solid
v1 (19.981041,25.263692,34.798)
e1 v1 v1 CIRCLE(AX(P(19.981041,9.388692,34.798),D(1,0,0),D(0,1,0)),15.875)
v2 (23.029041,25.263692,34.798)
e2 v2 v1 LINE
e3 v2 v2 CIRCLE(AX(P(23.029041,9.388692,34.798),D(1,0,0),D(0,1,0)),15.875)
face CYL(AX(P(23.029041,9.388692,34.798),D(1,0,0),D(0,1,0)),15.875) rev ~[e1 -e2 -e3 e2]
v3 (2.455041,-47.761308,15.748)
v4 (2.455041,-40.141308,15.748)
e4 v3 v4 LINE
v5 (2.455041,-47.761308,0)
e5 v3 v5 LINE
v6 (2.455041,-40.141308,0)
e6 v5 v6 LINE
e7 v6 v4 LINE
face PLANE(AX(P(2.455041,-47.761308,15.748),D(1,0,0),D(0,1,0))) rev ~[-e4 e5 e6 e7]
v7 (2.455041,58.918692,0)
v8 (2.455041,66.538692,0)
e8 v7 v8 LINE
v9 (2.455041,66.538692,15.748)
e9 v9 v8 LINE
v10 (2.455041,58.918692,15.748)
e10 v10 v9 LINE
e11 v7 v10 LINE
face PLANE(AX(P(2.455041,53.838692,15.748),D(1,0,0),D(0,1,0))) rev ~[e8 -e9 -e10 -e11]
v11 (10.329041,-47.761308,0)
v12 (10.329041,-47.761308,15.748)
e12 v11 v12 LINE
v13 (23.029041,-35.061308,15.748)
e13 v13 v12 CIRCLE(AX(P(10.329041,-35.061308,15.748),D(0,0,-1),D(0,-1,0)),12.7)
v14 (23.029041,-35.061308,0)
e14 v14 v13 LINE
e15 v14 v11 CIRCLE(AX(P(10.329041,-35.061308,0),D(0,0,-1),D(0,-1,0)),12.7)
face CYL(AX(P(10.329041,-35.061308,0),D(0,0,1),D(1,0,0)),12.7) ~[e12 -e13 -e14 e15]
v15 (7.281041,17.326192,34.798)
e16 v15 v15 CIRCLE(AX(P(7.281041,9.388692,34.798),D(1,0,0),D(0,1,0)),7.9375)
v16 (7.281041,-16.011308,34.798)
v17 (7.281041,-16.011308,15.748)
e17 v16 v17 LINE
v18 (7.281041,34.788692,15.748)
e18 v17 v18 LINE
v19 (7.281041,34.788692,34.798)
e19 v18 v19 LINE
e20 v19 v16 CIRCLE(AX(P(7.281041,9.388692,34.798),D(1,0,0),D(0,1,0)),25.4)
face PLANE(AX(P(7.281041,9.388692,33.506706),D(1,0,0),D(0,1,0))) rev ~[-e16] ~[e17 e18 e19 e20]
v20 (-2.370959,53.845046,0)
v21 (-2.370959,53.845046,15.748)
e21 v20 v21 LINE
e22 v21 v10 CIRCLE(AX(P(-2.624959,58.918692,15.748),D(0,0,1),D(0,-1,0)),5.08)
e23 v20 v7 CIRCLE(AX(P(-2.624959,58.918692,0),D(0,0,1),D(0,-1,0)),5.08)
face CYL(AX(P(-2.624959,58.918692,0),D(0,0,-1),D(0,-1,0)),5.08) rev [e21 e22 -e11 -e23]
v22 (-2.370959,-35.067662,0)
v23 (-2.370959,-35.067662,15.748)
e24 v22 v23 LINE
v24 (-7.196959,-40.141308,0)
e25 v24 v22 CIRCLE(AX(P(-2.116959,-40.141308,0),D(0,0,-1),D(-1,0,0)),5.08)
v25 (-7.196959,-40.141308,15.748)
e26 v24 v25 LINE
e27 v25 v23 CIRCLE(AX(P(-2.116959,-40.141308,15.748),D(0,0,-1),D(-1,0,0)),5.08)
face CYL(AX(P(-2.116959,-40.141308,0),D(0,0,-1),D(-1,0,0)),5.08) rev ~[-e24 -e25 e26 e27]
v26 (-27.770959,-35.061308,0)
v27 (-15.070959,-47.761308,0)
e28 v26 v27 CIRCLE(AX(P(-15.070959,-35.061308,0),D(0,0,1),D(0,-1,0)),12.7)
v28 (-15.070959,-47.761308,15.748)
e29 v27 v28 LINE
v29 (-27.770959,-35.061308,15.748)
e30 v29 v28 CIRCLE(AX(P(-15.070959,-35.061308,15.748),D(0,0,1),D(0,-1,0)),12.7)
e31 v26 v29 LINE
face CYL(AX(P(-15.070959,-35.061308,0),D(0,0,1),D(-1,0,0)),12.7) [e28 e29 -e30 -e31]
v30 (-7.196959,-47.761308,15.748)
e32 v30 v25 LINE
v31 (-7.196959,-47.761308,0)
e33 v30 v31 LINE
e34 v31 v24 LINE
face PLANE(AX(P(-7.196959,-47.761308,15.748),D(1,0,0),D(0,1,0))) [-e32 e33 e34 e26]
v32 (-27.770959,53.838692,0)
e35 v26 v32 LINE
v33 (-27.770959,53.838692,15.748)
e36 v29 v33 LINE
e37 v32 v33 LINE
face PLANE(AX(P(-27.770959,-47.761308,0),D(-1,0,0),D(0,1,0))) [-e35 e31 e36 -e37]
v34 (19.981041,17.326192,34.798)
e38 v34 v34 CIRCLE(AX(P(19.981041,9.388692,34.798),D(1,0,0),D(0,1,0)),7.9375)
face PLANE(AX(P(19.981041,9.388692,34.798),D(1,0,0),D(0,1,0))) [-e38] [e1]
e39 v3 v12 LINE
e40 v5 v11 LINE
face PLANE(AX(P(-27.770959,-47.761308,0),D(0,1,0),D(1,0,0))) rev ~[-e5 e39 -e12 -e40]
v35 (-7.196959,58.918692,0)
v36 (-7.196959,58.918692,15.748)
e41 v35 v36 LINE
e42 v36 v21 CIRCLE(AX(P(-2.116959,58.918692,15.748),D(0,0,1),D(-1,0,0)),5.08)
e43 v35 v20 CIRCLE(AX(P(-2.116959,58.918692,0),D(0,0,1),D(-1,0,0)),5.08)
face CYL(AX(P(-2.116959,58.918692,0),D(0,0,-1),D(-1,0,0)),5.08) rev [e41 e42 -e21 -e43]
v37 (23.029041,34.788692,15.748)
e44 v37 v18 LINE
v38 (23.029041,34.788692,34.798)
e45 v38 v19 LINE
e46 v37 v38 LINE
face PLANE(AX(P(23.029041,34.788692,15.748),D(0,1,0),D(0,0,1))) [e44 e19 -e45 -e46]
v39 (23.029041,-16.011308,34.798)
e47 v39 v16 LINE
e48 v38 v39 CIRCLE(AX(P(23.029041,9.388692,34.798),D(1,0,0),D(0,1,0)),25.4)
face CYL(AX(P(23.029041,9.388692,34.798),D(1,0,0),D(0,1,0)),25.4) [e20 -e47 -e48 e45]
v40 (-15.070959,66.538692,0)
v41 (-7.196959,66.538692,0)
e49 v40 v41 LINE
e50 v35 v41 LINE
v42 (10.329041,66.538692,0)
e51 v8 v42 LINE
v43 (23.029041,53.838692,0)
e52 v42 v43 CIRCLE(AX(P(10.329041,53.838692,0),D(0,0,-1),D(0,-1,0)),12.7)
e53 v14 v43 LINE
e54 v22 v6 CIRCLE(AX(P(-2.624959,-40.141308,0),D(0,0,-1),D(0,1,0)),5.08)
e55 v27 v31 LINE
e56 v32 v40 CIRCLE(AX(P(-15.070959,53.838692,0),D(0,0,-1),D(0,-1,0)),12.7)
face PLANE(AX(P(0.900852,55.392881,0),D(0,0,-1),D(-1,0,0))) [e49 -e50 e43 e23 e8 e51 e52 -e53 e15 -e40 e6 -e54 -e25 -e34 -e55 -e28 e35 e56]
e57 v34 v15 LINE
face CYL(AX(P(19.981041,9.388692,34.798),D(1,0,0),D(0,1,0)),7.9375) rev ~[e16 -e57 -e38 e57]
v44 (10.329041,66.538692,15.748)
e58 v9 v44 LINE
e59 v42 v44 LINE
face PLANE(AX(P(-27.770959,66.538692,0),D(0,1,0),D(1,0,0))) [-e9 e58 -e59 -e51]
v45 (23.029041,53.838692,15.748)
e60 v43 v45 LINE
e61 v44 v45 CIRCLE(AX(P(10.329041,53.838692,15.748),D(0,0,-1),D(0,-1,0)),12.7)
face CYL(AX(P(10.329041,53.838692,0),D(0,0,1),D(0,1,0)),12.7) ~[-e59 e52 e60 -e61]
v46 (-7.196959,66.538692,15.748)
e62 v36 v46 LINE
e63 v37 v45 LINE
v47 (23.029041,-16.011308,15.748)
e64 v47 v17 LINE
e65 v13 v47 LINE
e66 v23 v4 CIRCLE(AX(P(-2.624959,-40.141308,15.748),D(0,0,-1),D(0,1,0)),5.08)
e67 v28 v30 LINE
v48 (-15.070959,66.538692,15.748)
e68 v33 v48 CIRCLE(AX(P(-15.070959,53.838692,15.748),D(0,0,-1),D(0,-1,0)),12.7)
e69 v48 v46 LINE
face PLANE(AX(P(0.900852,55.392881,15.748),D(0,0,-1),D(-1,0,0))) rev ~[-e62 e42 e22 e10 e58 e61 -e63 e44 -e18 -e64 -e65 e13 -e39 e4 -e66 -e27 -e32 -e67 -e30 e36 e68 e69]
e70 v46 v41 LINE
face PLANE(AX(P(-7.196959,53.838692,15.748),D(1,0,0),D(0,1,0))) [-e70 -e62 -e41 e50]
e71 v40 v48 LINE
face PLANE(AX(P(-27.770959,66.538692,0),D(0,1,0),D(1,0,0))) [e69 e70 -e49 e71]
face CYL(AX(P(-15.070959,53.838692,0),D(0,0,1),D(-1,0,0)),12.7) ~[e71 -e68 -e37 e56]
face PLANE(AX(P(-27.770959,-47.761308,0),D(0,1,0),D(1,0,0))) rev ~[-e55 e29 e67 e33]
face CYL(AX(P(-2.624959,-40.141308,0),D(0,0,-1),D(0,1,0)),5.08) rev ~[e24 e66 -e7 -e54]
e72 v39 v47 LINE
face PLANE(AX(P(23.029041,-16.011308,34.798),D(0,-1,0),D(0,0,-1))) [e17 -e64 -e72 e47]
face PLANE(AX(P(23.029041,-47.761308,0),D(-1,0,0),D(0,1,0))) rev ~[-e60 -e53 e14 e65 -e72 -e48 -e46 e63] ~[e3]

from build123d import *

# Parameters (mm, degrees)
F0_W        = 50.8
F0_H        = 114.3
F1_DEPTH    = 15.748
F2_W        = 9.652
F2_H        = 12.7
F3_DEPTH    = 25.4
F4_R        = 12.7
F5_T1_DEPTH = 15.748
F7_DEPTH    = 15.748
F8_R        = 15.875
F9_DEPTH    = 3.048
F10_R       = 7.9375
F11_DEPTH   = 25.4


# Not quite as in the source:
# - a fillet or chamfer that OpenCascade refuses, or shapes differently, is made with other operations: its cross-section is extruded or revolved along the edge and cut away or added


with BuildPart() as f1:
    # F0 (on Top) → F1 (new body)
    with BuildSketch(Plane.XY):
        with Locations((-2.3709591478, 9.3886919219)):
            Rectangle(F0_W, F0_H)
    extrude(amount=F1_DEPTH)

    # F2 (on face) → F3 (cut)
    with BuildSketch(Plane.XY.offset(15.748)):
        with Locations((-2.3709591478, -41.4113080781)):
            Rectangle(F2_W, F2_H)
        with Locations((-2.3709591478, 60.1886919219)):
            Rectangle(F2_W, F2_H)
    extrude(amount=-F3_DEPTH, mode=Mode.SUBTRACT)

    # F4
    f4_edges = [f1.edges().sort_by_distance(p)[0] for p in [
        (-27.770959, 66.538692, 7.874),
        (23.029041, 66.538692, 7.874),
        (-27.770959, -47.761308, 7.874),
        (23.029041, -47.761308, 7.874),
    ]]
    fillet(f4_edges, radius=F4_R)

    # F5: fillet of radius 5.08 on 4 edges, made by hand

    # F5_s2 → F5_t1 (join)
    with BuildSketch(Plane.XY):
        with BuildLine():
            ThreePointArc((-2.6249591478, 53.8386919219), (0.9671433006, 55.3265894735), (2.4550408522, 58.9186919219))
            Line((2.4550408522, 58.9186919219), (2.4550408522, 53.8386919219))
            Line((2.4550408522, 53.8386919219), (-2.6249591478, 53.8386919219))
        make_face()
        with BuildLine():
            ThreePointArc((-7.1969591478, 58.9186919219), (-5.7090615962, 55.3265894735), (-2.1169591478, 53.8386919219))
            Line((-2.1169591478, 53.8386919219), (-7.1969591478, 53.8386919219))
            Line((-7.1969591478, 53.8386919219), (-7.1969591478, 58.9186919219))
        make_face()
        with BuildLine():
            ThreePointArc((-2.6249591478, -35.0613080781), (0.9671433006, -36.5492056297), (2.4550408522, -40.1413080781))
            Line((2.4550408522, -40.1413080781), (2.4550408522, -35.0613080781))
            Line((2.4550408522, -35.0613080781), (-2.6249591478, -35.0613080781))
        make_face()
        with BuildLine():
            ThreePointArc((-7.1969591478, -40.1413080781), (-5.7090615962, -36.5492056297), (-2.1169591478, -35.0613080781))
            Line((-2.1169591478, -35.0613080781), (-7.1969591478, -35.0613080781))
            Line((-7.1969591478, -35.0613080781), (-7.1969591478, -40.1413080781))
        make_face()
    extrude(amount=F5_T1_DEPTH)

    # F6 (on face) → F7 (join)
    with BuildSketch(Plane.YZ.offset(23.0290408522)):
        with BuildLine():
            Line((34.7886919219, 15.748), (34.7886919219, 34.798))
            ThreePointArc((34.7886919219, 34.798), (9.3886919219, 60.198), (-16.0113080781, 34.798))
            Line((-16.0113080781, 34.798), (-16.0113080781, 15.748))
            Line((-16.0113080781, 15.748), (34.7886919219, 15.748))
        make_face()
    extrude(amount=-F7_DEPTH)

    # F8 (on face) → F9 (cut)
    with BuildSketch(Plane.YZ.offset(23.0290408522)):
        with Locations((9.3886919219, 34.798)):
            Circle(F8_R)
    extrude(amount=-F9_DEPTH, mode=Mode.SUBTRACT)

    # F10 (on face) → F11 (cut)
    with BuildSketch(Plane.YZ.offset(19.9810408522)):
        with Locations((9.3886919219, 34.798)):
            Circle(F10_R)
    extrude(amount=-F11_DEPTH, mode=Mode.SUBTRACT)


solid = f1.part
